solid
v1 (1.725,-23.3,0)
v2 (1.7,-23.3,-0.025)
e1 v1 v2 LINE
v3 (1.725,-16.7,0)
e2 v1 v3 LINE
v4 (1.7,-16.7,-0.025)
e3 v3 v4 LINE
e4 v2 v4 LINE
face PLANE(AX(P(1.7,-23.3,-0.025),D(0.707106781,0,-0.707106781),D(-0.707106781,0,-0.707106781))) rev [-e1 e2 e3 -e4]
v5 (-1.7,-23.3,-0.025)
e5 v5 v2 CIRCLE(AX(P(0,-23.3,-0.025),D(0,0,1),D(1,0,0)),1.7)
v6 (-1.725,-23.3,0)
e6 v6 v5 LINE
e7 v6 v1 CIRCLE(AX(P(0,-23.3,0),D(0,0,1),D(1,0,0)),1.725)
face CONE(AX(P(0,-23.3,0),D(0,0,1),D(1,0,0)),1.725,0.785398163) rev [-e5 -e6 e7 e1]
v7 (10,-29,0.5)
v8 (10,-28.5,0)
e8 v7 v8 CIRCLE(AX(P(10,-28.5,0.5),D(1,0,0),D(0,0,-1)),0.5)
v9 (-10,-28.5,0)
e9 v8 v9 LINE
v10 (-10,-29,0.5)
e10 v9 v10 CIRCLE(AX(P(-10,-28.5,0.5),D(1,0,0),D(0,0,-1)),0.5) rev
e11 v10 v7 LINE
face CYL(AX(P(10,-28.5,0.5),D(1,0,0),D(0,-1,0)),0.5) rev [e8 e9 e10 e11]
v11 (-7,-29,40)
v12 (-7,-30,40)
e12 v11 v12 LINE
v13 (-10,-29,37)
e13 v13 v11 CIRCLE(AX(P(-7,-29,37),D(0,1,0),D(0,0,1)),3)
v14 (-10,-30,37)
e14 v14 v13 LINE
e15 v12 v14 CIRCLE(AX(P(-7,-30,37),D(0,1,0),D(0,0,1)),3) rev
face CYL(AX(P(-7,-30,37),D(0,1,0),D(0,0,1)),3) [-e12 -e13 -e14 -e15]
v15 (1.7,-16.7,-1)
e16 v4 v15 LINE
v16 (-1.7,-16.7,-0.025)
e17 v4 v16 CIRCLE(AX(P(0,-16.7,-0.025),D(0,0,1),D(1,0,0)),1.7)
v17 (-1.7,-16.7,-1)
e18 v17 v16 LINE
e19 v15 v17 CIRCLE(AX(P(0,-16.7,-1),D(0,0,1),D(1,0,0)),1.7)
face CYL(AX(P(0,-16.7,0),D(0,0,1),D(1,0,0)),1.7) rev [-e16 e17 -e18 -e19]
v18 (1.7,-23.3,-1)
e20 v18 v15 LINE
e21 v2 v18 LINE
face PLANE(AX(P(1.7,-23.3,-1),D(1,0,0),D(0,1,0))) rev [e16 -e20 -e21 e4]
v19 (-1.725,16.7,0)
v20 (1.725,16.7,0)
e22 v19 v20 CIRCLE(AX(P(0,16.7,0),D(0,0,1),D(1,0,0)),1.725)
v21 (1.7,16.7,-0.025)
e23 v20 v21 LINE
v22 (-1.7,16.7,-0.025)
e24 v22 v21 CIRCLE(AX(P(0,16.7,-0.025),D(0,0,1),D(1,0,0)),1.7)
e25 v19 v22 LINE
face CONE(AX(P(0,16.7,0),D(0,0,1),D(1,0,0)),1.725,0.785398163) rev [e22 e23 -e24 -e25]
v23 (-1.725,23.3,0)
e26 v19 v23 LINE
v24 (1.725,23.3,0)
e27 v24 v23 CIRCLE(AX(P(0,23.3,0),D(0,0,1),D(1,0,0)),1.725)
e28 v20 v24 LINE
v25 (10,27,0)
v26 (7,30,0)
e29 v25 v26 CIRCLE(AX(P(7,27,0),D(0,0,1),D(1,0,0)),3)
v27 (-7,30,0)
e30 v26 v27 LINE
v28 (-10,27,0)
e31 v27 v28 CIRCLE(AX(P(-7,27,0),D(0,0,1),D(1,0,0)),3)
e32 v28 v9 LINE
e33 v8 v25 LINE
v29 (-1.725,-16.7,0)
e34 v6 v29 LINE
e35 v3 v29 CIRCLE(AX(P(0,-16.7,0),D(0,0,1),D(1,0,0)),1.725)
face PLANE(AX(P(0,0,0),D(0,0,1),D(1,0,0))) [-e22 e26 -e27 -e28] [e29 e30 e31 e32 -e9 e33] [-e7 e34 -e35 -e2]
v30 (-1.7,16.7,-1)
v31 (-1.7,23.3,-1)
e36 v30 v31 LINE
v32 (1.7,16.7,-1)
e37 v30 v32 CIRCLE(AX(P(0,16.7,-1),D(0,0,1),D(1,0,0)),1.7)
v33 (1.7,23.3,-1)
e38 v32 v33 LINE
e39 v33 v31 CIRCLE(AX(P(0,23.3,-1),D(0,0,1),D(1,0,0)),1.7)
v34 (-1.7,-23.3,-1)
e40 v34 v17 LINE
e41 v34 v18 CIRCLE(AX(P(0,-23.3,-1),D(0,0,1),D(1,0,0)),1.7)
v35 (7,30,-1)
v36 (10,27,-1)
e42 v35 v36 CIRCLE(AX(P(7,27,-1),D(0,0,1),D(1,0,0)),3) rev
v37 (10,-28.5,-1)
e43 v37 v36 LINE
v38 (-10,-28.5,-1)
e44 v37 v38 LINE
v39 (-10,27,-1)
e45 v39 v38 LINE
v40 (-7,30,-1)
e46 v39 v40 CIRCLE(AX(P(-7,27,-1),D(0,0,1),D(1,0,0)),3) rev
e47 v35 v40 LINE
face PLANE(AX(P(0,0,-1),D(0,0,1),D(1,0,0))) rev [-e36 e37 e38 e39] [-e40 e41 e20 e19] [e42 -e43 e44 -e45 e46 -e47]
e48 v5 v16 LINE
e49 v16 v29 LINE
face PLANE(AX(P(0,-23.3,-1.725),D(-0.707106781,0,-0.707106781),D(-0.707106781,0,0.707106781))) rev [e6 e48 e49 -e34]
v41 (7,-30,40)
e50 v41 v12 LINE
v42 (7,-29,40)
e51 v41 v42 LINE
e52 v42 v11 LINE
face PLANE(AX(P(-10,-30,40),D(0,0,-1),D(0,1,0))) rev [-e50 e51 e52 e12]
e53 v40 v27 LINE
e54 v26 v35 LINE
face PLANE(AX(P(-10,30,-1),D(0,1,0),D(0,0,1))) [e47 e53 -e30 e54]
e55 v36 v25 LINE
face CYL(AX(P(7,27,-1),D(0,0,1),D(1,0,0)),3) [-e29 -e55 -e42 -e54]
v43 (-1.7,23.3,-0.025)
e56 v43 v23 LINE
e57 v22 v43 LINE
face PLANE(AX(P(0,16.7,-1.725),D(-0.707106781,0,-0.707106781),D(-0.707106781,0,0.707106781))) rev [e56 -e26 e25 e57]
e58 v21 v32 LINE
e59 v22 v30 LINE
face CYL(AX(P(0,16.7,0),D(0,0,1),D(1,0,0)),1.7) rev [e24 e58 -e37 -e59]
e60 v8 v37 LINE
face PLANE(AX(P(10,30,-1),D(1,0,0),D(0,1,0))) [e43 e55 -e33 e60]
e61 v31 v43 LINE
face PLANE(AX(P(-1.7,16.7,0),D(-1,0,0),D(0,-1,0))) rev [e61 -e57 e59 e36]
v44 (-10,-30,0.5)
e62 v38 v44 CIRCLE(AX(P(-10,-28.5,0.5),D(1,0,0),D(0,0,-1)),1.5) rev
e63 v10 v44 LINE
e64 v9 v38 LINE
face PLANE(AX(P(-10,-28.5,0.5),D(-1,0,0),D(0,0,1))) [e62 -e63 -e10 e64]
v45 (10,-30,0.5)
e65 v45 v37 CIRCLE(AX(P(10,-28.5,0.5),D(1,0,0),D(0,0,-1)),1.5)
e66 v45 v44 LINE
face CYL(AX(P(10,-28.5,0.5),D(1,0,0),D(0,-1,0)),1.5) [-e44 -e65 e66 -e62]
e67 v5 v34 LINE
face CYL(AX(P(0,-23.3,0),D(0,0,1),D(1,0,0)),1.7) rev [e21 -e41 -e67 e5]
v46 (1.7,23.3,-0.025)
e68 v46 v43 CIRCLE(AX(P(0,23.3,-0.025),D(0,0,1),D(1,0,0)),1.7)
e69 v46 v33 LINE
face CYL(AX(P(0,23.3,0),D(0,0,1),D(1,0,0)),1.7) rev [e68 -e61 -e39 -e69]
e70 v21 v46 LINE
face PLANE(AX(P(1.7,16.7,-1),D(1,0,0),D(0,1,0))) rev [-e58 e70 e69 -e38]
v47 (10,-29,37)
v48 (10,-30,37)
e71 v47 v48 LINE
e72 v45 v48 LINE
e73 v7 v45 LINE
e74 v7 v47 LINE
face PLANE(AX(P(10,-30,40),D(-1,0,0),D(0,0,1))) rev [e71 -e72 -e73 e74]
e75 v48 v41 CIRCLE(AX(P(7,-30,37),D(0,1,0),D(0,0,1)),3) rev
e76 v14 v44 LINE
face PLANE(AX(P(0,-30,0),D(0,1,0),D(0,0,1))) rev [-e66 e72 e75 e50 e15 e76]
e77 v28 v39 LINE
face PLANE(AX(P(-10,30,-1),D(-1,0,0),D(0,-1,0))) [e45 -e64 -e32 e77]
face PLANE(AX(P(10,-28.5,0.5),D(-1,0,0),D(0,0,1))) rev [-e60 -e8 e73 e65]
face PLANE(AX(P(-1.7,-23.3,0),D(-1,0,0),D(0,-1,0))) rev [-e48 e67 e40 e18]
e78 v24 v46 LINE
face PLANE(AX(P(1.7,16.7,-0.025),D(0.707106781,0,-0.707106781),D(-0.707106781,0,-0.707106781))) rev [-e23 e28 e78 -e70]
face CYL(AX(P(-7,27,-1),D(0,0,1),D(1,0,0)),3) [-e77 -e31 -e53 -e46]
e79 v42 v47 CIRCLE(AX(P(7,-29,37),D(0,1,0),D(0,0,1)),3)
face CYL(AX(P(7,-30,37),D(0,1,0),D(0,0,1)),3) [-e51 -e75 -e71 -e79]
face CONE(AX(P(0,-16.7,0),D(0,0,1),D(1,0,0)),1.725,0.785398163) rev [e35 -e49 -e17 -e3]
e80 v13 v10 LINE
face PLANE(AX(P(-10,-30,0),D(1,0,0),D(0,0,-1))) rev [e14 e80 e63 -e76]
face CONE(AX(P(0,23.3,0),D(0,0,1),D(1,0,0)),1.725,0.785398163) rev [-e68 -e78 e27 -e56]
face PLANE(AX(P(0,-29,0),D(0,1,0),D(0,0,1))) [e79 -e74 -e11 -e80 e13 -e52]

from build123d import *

# Parameters (mm, degrees)
SKETCH1_W                    = 20
SKETCH1_H                    = 60
BASE_FLANGE1_DEPTH           = 1
EDGE_FLANGE1_STRIP_W         = 5
EDGE_FLANGE1_STRIP_H         = 1
EDGE_FLANGE1_STRIP_CUT_DEPTH = 20
EDGE_FLANGE1_DEPTH           = 20
FILLET1_R                    = 3
M3_START                     = -1
M3_CLEARANCE_SLOT4_DEPTH     = 1


with BuildPart() as part:
    # Base-Flange1: sheet metal written as solids
    # Sketch1 → Base-Flange1 (new body)
    with BuildSketch(Plane.XY):
        Rectangle(SKETCH1_W, SKETCH1_H)
    extrude(amount=-BASE_FLANGE1_DEPTH)

    # Edge-Flange1: sheet metal written as solids
    # Edge-Flange1 strip (on a plane across the edge) → Edge-Flange1 strip cut (cut)
    with BuildSketch(Plane(origin=(-10, -30, 0), x_dir=(0, 1, 0), z_dir=(1, 0, 0))):
        with Locations((-1, -0.5)):
            Rectangle(EDGE_FLANGE1_STRIP_W, EDGE_FLANGE1_STRIP_H)
    extrude(amount=EDGE_FLANGE1_STRIP_CUT_DEPTH, mode=Mode.SUBTRACT)

    # Edge-Flange1 section (on a plane across the edge) → Edge-Flange1 (add)
    with BuildSketch(Plane(origin=(-10, -30, 0), x_dir=(0, 1, 0), z_dir=(1, 0, 0))):
        with BuildLine():
            Line((0, 0.5), (0, 40))
            Line((0, 40), (1, 40))
            Line((1, 40), (1, 0.5))
            ThreePointArc((1, 0.5), (1.146446609, 0.146446609), (1.5, 0))
            Line((1.5, 0), (1.5, -1))
            ThreePointArc((1.5, -1), (0.439339828, -0.560660172), (0, 0.5))
        make_face()
    extrude(amount=EDGE_FLANGE1_DEPTH)

    # Fillet1
    fillet1_edges = [part.edges().sort_by_distance(p)[0] for p in [
        (-10, -29.5, 40),
        (10, -29.5, 40),
        (-10, 30, -0.5),
        (10, 30, -0.5),
    ]]
    fillet(fillet1_edges, radius=FILLET1_R)

    # M3 Clearance Slot4: read off the stored shape, not the designer's step
    # M3 Clearance Slot4 outline → M3 Clearance Slot4 (cut)
    with BuildSketch(Plane.XY.offset(M3_START)):
        with BuildLine():
            Line((1.7, -23.3), (1.7, -16.7))
            ThreePointArc((1.7, -16.7), (0, -15), (-1.7, -16.7))
            Line((-1.7, -16.7), (-1.7, -23.3))
            ThreePointArc((-1.7, -23.3), (0, -25), (1.7, -23.3))
        make_face()
        with BuildLine():
            ThreePointArc((1.7, 23.3), (0, 25), (-1.7, 23.3))
            Line((-1.7, 23.3), (-1.7, 16.7))
            ThreePointArc((-1.7, 16.7), (0, 15), (1.7, 16.7))
            Line((1.7, 16.7), (1.7, 23.3))
        make_face()
    extrude(amount=M3_CLEARANCE_SLOT4_DEPTH, mode=Mode.SUBTRACT)

    # M3 Clearance Slot4 2: loft between two sections, ruled curve by curve
    m3_clearance_slot4_2_from = [
        Edge.make_three_point_arc((1.7, -16.7, -0.025), (1.202081528, -15.497918472, -0.025), (0, -15, -0.025)),
        Edge.make_three_point_arc((0, -15, -0.025), (-1.202081528, -15.497918472, -0.025), (-1.7, -16.7, -0.025)),
        Edge.make_three_point_arc((-1.7, -23.3, -0.025), (-1.202081528, -24.502081528, -0.025), (0, -25, -0.025)),
        Edge.make_three_point_arc((0, -25, -0.025), (1.202081528, -24.502081528, -0.025), (1.7, -23.3, -0.025)),
        Edge.make_line((-1.7, -16.7, -0.025), (-1.7, -23.3, -0.025)),
        Edge.make_line((1.7, -16.7, -0.025), (1.7, -23.3, -0.025)),
    ]
    m3_clearance_slot4_2_to = [
        Edge.make_three_point_arc((1.725, -16.7, 0), (1.219759198, -15.480240802, 0), (0, -14.975, 0)),
        Edge.make_three_point_arc((0, -14.975, 0), (-1.219759198, -15.480240802, 0), (-1.725, -16.7, 0)),
        Edge.make_three_point_arc((-1.725, -23.3, 0), (-1.219759198, -24.519759198, 0), (0, -25.025, 0)),
        Edge.make_three_point_arc((0, -25.025, 0), (1.219759198, -24.519759198, 0), (1.725, -23.3, 0)),
        Edge.make_line((-1.725, -16.7, 0), (-1.725, -23.3, 0)),
        Edge.make_line((1.725, -16.7, 0), (1.725, -23.3, 0)),
    ]
    m3_clearance_slot4_2 = Solid(Shell([*[Face.make_surface_from_curves(m3_clearance_slot4_2_from[k], m3_clearance_slot4_2_to[k]) for k in range(6)], Face(Wire(m3_clearance_slot4_2_from)), Face(Wire(m3_clearance_slot4_2_to))]))
    add(m3_clearance_slot4_2, mode=Mode.SUBTRACT)

    # M3 Clearance Slot4 3: loft between two sections, ruled curve by curve
    m3_clearance_slot4_3_from = [
        Edge.make_three_point_arc((1.7, 23.3, -0.025), (1.202081528, 24.502081528, -0.025), (0, 25, -0.025)),
        Edge.make_three_point_arc((0, 25, -0.025), (-1.202081528, 24.502081528, -0.025), (-1.7, 23.3, -0.025)),
        Edge.make_three_point_arc((-1.7, 16.7, -0.025), (-1.202081528, 15.497918472, -0.025), (0, 15, -0.025)),
        Edge.make_three_point_arc((0, 15, -0.025), (1.202081528, 15.497918472, -0.025), (1.7, 16.7, -0.025)),
        Edge.make_line((-1.7, 23.3, -0.025), (-1.7, 16.7, -0.025)),
        Edge.make_line((1.7, 23.3, -0.025), (1.7, 16.7, -0.025)),
    ]
    m3_clearance_slot4_3_to = [
        Edge.make_three_point_arc((1.725, 23.3, 0), (1.219759198, 24.519759198, 0), (0, 25.025, 0)),
        Edge.make_three_point_arc((0, 25.025, 0), (-1.219759198, 24.519759198, 0), (-1.725, 23.3, 0)),
        Edge.make_three_point_arc((-1.725, 16.7, 0), (-1.219759198, 15.480240802, 0), (0, 14.975, 0)),
        Edge.make_three_point_arc((0, 14.975, 0), (1.219759198, 15.480240802, 0), (1.725, 16.7, 0)),
        Edge.make_line((-1.725, 23.3, 0), (-1.725, 16.7, 0)),
        Edge.make_line((1.725, 23.3, 0), (1.725, 16.7, 0)),
    ]
    m3_clearance_slot4_3 = Solid(Shell([*[Face.make_surface_from_curves(m3_clearance_slot4_3_from[k], m3_clearance_slot4_3_to[k]) for k in range(6)], Face(Wire(m3_clearance_slot4_3_from)), Face(Wire(m3_clearance_slot4_3_to))]))
    add(m3_clearance_slot4_3, mode=Mode.SUBTRACT)


solid = part.part
